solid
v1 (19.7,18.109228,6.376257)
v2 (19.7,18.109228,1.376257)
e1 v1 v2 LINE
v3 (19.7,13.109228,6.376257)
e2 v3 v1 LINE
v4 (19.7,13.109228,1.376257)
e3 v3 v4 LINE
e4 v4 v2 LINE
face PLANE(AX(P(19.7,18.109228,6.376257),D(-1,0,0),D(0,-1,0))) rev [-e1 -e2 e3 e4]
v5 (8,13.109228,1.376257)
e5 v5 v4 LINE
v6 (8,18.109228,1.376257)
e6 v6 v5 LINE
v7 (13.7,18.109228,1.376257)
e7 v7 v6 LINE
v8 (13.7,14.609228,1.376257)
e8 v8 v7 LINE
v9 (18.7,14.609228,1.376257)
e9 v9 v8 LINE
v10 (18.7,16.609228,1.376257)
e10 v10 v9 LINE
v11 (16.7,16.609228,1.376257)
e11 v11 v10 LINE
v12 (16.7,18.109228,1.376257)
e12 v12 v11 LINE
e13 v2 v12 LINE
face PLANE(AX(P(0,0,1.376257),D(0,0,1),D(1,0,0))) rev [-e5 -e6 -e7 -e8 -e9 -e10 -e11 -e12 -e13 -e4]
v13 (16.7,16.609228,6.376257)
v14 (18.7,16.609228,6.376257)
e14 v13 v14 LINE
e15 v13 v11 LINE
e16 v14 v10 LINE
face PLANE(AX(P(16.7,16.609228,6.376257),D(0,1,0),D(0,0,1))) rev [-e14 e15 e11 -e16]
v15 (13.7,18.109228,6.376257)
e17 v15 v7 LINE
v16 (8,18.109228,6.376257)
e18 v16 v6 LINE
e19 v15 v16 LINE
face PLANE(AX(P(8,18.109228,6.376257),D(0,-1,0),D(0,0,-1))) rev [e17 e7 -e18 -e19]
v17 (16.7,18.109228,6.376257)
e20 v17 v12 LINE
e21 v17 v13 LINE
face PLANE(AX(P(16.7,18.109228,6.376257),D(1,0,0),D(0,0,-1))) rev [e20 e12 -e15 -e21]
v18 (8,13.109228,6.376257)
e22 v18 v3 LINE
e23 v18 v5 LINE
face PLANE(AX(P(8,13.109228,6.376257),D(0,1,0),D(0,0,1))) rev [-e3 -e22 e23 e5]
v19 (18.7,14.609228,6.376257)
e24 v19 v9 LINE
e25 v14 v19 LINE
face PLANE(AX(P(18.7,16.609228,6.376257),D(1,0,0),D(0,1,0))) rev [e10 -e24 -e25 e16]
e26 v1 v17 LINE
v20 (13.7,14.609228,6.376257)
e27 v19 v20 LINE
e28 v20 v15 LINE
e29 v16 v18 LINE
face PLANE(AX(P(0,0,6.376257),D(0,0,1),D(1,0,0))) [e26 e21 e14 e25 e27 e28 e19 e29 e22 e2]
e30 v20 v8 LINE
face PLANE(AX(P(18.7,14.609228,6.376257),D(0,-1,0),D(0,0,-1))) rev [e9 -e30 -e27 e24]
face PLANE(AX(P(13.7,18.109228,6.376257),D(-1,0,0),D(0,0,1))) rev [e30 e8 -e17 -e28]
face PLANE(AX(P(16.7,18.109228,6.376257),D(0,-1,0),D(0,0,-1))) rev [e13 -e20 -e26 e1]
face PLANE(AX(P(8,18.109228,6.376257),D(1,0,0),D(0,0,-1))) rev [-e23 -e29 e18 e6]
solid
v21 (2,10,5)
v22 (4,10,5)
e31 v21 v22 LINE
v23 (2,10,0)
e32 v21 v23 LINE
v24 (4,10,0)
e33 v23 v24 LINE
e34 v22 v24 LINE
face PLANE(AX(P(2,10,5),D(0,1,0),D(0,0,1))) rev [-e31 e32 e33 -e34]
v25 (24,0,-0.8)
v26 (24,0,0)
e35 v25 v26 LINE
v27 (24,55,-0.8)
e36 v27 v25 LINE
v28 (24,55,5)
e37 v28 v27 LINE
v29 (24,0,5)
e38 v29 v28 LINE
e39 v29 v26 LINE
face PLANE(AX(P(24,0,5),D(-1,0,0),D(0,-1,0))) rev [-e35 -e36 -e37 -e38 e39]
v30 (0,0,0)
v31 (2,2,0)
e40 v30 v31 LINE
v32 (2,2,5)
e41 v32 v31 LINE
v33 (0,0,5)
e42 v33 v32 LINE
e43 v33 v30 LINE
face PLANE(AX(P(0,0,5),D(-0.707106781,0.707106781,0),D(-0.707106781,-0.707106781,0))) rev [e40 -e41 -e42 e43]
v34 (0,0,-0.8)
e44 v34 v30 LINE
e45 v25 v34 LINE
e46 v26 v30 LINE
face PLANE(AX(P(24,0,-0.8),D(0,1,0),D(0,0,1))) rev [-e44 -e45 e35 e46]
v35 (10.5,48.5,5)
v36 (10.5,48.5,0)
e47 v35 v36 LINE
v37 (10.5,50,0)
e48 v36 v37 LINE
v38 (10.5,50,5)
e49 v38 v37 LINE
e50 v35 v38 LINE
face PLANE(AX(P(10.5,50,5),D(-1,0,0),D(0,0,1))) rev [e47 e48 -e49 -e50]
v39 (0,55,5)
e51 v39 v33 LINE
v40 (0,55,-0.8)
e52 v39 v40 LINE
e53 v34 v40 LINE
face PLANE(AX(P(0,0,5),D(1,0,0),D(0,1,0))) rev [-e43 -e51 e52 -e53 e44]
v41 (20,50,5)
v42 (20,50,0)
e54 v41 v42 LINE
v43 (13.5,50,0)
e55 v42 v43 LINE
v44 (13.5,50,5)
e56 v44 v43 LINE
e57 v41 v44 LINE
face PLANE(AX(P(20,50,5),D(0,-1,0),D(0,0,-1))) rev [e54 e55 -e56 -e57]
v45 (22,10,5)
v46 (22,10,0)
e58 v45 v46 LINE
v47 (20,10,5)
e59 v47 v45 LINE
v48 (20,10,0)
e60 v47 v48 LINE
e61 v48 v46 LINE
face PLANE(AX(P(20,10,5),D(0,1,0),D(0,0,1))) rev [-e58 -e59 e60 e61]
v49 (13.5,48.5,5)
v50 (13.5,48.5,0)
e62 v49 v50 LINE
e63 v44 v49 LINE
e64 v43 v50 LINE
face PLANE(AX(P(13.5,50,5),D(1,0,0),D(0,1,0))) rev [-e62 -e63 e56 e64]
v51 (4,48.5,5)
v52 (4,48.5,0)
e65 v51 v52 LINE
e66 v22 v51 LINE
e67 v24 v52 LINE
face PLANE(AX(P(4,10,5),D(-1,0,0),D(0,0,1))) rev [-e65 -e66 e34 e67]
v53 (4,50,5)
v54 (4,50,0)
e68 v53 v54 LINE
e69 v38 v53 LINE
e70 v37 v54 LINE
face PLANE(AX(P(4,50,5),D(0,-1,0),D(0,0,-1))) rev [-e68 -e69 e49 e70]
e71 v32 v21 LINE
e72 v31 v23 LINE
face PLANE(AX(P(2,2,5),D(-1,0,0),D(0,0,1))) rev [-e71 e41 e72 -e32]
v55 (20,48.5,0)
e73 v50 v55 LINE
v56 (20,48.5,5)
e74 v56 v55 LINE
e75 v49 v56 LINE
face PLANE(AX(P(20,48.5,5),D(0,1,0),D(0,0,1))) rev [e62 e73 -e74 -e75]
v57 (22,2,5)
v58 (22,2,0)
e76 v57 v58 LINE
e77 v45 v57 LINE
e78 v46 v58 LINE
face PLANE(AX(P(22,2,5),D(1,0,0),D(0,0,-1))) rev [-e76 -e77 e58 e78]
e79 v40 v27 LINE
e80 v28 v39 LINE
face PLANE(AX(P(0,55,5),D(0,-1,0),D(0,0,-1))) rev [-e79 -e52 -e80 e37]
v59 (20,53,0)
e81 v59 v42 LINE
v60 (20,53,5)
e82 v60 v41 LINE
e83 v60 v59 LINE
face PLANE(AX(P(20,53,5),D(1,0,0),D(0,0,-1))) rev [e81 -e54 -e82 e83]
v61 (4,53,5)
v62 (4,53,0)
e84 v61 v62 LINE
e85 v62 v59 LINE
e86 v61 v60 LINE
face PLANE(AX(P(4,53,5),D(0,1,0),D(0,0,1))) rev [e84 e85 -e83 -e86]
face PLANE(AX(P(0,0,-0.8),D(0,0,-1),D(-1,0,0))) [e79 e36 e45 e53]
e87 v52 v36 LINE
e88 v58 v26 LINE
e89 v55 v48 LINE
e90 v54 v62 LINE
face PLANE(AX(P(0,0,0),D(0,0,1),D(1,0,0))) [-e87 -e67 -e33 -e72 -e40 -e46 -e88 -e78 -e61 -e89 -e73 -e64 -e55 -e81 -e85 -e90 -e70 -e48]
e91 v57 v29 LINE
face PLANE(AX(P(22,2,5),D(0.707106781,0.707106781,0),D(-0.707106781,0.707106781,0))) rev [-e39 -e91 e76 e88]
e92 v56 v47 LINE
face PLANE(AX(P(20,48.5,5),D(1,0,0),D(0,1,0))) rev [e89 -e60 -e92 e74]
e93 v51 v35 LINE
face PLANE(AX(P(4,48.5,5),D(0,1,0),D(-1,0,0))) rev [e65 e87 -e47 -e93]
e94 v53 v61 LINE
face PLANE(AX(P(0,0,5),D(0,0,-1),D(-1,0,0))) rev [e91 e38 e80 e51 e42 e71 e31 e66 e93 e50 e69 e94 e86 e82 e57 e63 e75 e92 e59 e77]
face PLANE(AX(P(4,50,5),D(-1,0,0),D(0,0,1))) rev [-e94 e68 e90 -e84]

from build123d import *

# Parameters (mm, degrees)
BOSS_EXTRUDE1_DEPTH   = 5
BOSS_EXTRUDE1_2_DEPTH = 5
SKETCH2_W             = 24
SKETCH2_H             = 55
BOSS_EXTRUDE2_DEPTH   = 0.8
SPLIT1_DEPTH          = 5
SPLIT1_2_DEPTH        = 5


# Read off the part's stored shape, not the designer's step: Split1
with BuildPart() as part:
    # Sketch1 → Boss-Extrude1 (new body)
    with BuildSketch(Plane.XY):
        Polygon((4, 53), (20, 53), (20, 50), (13.5, 50), (13.5, 48.5), (20, 48.5), (20, 10), (22, 10), (22, 2), (24, 0), (24, 55), (0, 55), (0, 0), (2, 2), (2, 10), (4, 10), (4, 48.5), (10.5, 48.5), (10.5, 50), (4, 50), align=None)
    extrude(amount=BOSS_EXTRUDE1_DEPTH)



with BuildPart() as body_2:
    # Sketch1 → Boss-Extrude1 2 (new body)
    with BuildSketch(Plane.XY):
        Polygon((8, 18.109227635), (13.7, 18.109227635), (13.7, 17.909227635), (13.7, 14.609227635), (18.7, 14.609227635), (18.7, 16.609227635), (16.7, 16.609227635), (16.7, 18.109227635), (19.7, 18.109227635), (19.7, 13.109227635), (8, 13.109227635), align=None)
    extrude(amount=BOSS_EXTRUDE1_2_DEPTH)


with BuildPart() as part_1:
    add(part.part)

    add(body_2.part)  # Boss-Extrude2 merges body 2
    # Sketch2 → Boss-Extrude2 (add)
    with BuildSketch(Plane(origin=(0, 0, 0), x_dir=(-1, 0, 0), z_dir=(0, 0, -1))):
        with Locations((-12, 27.5)):
            Rectangle(SKETCH2_W, SKETCH2_H)
    extrude(amount=BOSS_EXTRUDE2_DEPTH)

    # Split1 outline → Split1 (cut)
    with BuildSketch(Plane.XY):
        Polygon((8, 18.109227635), (8, 13.109227635), (19.7, 13.109227635), (19.7, 18.109227635), (16.7, 18.109227635), (16.7, 16.609227635), (18.7, 16.609227635), (18.7, 14.609227635), (13.7, 14.609227635), (13.7, 18.109227635), align=None)
    extrude(amount=SPLIT1_DEPTH, mode=Mode.SUBTRACT)


with BuildPart() as body_2_2:
    # Split1 2 outline → Split1 2 (new body)
    with BuildSketch(Plane.XY):
        Polygon((8, 13.109227635), (19.7, 13.109227635), (19.7, 18.109227635), (16.7, 18.109227635), (16.7, 16.609227635), (18.7, 16.609227635), (18.7, 14.609227635), (13.7, 14.609227635), (13.7, 18.109227635), (8, 18.109227635), align=None)
    extrude(amount=SPLIT1_2_DEPTH)


with BuildPart() as body_2_2_1:
    # Body-Move/Copy1: moved
    add(body_2_2.part.moved(Location((0, 0, 1.376257347))))


solid = Compound([part_1.part, body_2_2_1.part])
